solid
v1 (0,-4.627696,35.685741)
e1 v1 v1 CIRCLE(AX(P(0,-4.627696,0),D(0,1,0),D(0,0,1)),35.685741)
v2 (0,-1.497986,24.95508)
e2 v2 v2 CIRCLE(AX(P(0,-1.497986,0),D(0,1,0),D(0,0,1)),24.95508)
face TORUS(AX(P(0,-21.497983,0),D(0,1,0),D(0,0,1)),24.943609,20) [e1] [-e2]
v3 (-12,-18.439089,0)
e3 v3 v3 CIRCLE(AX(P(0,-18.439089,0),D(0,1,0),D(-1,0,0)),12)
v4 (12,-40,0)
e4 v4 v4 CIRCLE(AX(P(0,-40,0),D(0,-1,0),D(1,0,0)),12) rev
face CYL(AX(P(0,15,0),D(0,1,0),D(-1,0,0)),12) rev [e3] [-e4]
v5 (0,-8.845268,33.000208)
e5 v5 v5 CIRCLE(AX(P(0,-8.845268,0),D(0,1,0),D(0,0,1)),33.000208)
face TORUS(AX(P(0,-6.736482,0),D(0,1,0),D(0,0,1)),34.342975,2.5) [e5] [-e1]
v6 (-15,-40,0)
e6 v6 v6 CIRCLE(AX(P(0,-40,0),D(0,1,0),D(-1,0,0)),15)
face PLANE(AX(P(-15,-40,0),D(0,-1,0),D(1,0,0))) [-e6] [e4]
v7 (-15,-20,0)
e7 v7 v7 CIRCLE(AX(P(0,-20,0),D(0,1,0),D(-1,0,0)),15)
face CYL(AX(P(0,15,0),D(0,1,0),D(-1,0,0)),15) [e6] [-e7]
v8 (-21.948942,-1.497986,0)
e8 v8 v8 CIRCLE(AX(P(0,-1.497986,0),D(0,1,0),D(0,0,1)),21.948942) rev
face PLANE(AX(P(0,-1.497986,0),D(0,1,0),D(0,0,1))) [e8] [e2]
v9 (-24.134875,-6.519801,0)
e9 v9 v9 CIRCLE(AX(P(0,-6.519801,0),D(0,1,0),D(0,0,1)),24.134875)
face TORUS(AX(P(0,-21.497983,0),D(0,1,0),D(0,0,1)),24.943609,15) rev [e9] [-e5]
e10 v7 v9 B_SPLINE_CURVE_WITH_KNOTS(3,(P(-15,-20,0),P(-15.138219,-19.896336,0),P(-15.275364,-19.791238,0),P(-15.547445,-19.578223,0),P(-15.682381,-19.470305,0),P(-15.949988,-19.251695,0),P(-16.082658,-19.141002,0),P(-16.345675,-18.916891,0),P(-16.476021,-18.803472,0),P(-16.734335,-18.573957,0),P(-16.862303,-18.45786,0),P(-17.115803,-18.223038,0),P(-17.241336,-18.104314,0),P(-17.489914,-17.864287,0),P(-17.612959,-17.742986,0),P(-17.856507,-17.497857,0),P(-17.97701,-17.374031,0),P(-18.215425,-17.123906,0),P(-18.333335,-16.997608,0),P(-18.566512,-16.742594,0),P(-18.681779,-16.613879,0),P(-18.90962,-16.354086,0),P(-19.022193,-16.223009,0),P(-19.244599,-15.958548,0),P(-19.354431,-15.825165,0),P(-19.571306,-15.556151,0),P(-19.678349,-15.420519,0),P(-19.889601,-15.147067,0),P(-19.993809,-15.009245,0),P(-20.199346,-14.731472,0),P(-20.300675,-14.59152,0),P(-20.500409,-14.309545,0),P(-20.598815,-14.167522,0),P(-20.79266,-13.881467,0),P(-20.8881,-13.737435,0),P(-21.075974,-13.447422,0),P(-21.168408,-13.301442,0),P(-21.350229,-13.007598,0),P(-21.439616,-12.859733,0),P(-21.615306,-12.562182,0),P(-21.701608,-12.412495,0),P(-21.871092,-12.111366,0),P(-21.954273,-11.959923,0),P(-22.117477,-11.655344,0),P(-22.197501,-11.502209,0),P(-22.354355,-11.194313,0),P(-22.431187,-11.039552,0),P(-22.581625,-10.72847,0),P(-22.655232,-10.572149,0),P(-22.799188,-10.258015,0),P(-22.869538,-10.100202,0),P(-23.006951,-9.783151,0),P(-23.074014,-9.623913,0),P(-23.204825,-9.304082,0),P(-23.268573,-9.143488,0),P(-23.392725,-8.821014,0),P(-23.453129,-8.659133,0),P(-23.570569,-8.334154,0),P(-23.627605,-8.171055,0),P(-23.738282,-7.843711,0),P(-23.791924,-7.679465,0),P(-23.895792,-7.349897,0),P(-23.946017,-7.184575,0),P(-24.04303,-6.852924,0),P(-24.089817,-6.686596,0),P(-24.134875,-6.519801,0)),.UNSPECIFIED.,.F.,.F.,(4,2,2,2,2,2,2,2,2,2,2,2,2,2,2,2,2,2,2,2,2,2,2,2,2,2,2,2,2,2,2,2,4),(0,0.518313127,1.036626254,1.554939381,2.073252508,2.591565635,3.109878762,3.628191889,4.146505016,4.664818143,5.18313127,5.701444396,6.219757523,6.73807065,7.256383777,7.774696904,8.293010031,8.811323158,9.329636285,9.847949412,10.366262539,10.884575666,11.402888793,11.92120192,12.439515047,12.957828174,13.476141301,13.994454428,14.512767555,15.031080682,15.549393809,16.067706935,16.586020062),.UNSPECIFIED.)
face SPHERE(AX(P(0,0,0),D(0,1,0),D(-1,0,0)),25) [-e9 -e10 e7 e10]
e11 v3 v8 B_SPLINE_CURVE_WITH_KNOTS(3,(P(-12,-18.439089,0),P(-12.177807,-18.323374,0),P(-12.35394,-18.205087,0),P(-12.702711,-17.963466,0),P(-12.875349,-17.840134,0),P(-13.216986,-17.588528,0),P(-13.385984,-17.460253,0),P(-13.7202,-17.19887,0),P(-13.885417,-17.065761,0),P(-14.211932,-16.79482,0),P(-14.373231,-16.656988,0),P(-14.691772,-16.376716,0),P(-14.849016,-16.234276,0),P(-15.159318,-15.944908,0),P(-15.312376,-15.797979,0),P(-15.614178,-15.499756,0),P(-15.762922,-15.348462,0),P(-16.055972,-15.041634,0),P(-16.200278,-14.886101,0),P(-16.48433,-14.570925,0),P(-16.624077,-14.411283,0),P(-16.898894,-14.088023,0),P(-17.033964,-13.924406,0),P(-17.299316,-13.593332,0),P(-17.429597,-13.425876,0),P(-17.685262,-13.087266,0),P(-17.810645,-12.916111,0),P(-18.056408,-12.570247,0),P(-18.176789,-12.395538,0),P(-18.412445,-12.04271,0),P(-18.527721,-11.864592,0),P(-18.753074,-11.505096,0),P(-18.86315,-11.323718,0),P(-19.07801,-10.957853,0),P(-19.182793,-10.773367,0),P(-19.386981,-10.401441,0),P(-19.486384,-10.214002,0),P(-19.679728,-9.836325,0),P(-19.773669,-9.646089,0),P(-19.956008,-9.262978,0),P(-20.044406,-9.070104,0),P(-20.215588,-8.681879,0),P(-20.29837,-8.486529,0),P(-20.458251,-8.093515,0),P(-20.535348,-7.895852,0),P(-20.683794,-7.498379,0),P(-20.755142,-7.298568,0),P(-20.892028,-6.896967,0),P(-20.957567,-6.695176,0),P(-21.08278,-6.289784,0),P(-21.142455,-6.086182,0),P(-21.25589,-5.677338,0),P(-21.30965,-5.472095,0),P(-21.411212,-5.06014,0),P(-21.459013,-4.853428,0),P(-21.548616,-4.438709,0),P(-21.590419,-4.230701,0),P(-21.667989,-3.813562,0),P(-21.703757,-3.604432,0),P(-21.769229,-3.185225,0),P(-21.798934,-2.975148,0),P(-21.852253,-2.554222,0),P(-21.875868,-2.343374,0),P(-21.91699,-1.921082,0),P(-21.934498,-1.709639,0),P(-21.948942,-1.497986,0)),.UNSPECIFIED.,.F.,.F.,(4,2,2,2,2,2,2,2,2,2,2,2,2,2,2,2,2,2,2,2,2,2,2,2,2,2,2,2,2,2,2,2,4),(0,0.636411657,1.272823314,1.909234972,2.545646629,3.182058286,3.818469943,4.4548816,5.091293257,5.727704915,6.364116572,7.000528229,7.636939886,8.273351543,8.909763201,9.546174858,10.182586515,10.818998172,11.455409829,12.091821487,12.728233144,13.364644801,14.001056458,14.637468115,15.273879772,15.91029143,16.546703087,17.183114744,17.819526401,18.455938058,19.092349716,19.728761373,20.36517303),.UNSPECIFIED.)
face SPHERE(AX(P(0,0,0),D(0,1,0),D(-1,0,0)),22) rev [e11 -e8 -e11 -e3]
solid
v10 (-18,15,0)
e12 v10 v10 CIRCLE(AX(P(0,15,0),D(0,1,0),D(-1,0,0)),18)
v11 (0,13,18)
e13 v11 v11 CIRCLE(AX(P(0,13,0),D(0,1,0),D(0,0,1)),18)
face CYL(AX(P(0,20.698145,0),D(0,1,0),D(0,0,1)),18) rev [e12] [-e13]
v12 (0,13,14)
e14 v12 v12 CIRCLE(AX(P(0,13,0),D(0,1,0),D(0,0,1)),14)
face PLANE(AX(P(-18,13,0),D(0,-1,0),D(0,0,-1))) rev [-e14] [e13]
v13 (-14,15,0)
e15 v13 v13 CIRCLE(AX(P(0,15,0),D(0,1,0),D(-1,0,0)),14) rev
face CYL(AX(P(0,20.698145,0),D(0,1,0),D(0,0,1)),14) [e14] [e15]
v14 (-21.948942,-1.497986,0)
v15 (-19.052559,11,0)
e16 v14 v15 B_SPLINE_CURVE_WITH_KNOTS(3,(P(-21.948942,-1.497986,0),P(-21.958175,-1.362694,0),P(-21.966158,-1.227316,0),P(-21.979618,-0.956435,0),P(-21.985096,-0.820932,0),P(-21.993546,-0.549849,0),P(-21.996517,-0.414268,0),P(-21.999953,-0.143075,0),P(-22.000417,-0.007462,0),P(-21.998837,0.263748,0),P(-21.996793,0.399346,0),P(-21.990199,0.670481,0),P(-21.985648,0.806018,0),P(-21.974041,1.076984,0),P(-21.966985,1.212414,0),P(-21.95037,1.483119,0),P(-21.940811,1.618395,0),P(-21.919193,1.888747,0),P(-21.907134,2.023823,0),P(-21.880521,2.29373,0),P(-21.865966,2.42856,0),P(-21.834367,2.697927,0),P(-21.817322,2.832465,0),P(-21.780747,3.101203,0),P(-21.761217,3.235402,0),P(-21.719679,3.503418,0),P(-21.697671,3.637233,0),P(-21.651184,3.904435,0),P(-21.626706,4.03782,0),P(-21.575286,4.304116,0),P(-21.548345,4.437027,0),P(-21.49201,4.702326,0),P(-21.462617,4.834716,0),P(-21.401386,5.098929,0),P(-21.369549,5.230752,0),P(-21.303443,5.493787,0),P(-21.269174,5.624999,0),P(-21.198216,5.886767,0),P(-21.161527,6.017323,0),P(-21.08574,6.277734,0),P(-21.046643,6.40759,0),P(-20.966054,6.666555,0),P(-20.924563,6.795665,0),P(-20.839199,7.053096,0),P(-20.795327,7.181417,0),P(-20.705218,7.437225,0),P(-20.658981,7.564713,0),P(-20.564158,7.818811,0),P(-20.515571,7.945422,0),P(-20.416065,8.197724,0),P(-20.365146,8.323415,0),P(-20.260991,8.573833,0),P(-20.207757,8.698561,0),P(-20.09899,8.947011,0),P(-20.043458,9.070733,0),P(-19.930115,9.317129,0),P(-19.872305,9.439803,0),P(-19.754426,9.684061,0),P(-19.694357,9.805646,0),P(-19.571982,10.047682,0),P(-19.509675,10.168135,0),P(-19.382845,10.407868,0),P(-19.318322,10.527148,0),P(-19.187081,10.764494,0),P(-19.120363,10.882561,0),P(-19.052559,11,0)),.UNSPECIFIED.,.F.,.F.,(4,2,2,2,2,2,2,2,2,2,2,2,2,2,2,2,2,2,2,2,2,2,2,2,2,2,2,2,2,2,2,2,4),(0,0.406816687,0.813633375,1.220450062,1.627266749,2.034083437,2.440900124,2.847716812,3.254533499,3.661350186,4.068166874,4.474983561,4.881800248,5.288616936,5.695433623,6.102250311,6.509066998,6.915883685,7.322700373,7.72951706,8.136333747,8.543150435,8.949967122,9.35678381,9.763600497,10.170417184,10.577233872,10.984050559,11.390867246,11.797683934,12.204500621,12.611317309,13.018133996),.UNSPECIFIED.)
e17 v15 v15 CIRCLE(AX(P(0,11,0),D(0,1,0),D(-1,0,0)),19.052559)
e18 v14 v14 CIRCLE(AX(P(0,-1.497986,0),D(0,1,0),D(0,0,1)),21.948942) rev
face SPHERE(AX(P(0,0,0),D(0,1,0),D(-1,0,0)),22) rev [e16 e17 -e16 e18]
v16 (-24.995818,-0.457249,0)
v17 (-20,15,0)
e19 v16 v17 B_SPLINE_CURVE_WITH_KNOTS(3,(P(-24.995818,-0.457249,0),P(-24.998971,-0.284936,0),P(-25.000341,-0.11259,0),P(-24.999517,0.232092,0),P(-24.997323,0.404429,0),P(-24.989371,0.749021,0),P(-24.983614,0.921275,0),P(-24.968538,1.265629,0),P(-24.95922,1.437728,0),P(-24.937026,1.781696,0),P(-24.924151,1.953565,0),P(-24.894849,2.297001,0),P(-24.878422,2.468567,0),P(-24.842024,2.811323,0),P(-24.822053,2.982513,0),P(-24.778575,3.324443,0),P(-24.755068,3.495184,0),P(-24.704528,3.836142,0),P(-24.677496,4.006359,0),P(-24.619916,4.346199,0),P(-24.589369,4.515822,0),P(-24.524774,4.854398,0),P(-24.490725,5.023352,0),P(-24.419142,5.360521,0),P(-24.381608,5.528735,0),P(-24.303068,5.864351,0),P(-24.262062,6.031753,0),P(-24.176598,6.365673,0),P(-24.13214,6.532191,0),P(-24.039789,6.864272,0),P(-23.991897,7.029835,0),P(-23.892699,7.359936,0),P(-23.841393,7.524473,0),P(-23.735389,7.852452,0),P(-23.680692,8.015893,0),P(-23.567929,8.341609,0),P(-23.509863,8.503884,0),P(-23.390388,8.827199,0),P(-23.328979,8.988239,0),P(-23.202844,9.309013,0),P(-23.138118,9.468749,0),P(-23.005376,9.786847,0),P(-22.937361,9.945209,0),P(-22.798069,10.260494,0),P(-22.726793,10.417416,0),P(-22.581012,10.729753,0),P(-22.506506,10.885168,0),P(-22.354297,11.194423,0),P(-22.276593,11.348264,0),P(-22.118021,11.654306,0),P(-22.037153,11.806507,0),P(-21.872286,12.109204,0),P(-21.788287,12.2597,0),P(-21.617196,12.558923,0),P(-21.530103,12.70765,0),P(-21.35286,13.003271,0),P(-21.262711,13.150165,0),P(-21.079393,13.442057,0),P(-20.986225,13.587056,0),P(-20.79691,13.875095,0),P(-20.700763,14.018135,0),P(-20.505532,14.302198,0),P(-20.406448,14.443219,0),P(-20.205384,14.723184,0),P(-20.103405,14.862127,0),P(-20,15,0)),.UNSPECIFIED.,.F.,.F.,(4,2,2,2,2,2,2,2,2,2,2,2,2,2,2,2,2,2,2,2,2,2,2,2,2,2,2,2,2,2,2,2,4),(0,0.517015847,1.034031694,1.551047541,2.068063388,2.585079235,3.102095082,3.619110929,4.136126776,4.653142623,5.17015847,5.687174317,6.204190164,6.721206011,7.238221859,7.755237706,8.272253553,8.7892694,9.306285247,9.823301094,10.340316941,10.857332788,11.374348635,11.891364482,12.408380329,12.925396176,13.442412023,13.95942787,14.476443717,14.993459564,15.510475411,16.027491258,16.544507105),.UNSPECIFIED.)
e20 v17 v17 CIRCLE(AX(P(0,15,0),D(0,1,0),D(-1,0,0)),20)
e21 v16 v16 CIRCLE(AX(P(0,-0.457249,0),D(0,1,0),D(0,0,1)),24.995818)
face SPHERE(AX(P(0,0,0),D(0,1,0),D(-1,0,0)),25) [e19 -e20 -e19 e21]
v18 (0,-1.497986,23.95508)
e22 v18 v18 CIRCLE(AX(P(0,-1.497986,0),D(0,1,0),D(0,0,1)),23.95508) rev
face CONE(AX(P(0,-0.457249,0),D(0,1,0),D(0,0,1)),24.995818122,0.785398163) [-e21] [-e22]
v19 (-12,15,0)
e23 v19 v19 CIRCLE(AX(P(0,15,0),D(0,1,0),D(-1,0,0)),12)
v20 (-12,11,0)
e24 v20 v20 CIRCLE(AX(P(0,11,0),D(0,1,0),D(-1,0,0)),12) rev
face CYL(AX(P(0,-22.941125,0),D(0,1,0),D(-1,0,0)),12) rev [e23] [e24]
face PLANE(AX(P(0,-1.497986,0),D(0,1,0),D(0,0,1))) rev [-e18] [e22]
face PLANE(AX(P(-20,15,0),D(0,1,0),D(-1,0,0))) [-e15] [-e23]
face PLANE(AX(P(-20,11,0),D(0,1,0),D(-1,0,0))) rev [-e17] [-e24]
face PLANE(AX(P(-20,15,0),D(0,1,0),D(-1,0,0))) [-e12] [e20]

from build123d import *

# Parameters (mm, degrees)
SKETCH3_W          = 4
SKETCH3_H          = 3
SKETCH4_R          = 12
CUT_EXTRUDE1_DEPTH = 4
CHAMFER2_SIZE      = 1


with BuildPart() as part:
    # Sketch1 → Revolve1 (revolve)
    with BuildSketch(Plane.XY):
        with BuildLine():
            Line((-20, 15), (0, 15))
            Line((0, 15), (0, -40))
            Line((0, -40), (-15, -40))
            Line((-15, -40), (-15, -20))
            ThreePointArc((-15, -20), (-24.748737342, -3.535533906), (-20, 15))
        make_face()
    revolve(axis=Axis((0, 15, 0), (0, -1, 0)))

    # Shell1: read off the stored shape, not the designer's step
    # Shell1 outline → Shell1 (revolve, cut)
    with BuildSketch(Plane.XY):
        with BuildLine():
            Line((0, 11.000000019), (0, -40))
            Line((0, -40), (12, -40))
            Line((12, -40), (11.999999994, -18.439088919))
            ThreePointArc((11.999999994, -18.439088919), (21.394633494, -5.125393415), (19.052558877, 11.000000009))
            Line((19.052558877, 11.000000009), (0, 11.000000019))
        make_face()
    revolve(axis=Axis((0, 0, 0), (0, 1, 0)), mode=Mode.SUBTRACT)

    # Sketch2 → Revolve2 (revolve)
    with BuildSketch(Plane.XY, mode=Mode.PRIVATE) as revolve2_sk:
        with BuildLine():
            ThreePointArc((35.68574149, -4.627695861), (30.543499117, -2.297951073), (24.955080375, -1.497986479))
            ThreePointArc((24.955080375, -1.497986479), (24.673074146, -4.029815401), (24.134875143, -6.51980075))
            ThreePointArc((24.134875143, -6.51980075), (28.749504169, -6.988842493), (33.000208426, -8.845267693))
            ThreePointArc((33.000208426, -8.845267693), (36.451760874, -8.079248309), (35.68574149, -4.627695861))
        make_face()
    revolve(revolve2_sk.sketch.rotate(Axis((0, 9.125540713, 0), (0, -1, 0)), 180), axis=Axis((0, 9.125540713, 0), (0, -1, 0)))

    # Sketch3 → Cut-Revolve1 (revolve, cut)
    with BuildSketch(Plane.XY, mode=Mode.PRIVATE) as cut_revolve1_sk:
        with Locations((-16, 14.5)):
            Rectangle(SKETCH3_W, SKETCH3_H)
    revolve(cut_revolve1_sk.sketch.rotate(Axis((0, 20.698145497, 0), (0, -1, 0)), 270), axis=Axis((0, 20.698145497, 0), (0, -1, 0)), mode=Mode.SUBTRACT)

    # Sketch4 → Cut-Extrude1 (cut)
    with BuildSketch(Plane(origin=(0, 15, 0), x_dir=(1, 0, 0), z_dir=(0, 1, 0))):
        with Locations(Location((0, 0, 0), (0, 0, 180))):
            Circle(SKETCH4_R)
    extrude(amount=-CUT_EXTRUDE1_DEPTH, mode=Mode.SUBTRACT)


with BuildPart() as body_2:
    # Split1: the piece on the far side of the plane
    add(part.part)
    split(bisect_by=Plane.ZX.offset(-1.497986479), keep=Keep.BOTTOM)


with BuildPart() as part_1:
    add(part.part)

    # Split1
    split(bisect_by=Plane.ZX.offset(-1.497986479), keep=Keep.TOP)

    # Chamfer2
    # the kernel refuses this chamfer: 1.065775672, 1 mm, written as the material it takes off along each edge
    with BuildSketch(Plane(origin=(0, -1.497986479, 0), x_dir=(-1, 0, 0), z_dir=(0, 0, 1))) as chamfer2_piece_1:
        with BuildLine():
            Line((24.995818122, -1.040737747), (24.955080375 - CHAMFER2_SIZE, 0))
            Line((24.955080375 - CHAMFER2_SIZE, 0), (24.955080375, 0))
            ThreePointArc((24.955080375, 0), (24.981476681, -0.535789595), (24.995818122, -1.040737747))
        make_face()
    revolve(axis=Axis((0, -1.497986479, 0), (0, -1, 0)), mode=Mode.SUBTRACT)


solid = Compound([body_2.part, part_1.part])
